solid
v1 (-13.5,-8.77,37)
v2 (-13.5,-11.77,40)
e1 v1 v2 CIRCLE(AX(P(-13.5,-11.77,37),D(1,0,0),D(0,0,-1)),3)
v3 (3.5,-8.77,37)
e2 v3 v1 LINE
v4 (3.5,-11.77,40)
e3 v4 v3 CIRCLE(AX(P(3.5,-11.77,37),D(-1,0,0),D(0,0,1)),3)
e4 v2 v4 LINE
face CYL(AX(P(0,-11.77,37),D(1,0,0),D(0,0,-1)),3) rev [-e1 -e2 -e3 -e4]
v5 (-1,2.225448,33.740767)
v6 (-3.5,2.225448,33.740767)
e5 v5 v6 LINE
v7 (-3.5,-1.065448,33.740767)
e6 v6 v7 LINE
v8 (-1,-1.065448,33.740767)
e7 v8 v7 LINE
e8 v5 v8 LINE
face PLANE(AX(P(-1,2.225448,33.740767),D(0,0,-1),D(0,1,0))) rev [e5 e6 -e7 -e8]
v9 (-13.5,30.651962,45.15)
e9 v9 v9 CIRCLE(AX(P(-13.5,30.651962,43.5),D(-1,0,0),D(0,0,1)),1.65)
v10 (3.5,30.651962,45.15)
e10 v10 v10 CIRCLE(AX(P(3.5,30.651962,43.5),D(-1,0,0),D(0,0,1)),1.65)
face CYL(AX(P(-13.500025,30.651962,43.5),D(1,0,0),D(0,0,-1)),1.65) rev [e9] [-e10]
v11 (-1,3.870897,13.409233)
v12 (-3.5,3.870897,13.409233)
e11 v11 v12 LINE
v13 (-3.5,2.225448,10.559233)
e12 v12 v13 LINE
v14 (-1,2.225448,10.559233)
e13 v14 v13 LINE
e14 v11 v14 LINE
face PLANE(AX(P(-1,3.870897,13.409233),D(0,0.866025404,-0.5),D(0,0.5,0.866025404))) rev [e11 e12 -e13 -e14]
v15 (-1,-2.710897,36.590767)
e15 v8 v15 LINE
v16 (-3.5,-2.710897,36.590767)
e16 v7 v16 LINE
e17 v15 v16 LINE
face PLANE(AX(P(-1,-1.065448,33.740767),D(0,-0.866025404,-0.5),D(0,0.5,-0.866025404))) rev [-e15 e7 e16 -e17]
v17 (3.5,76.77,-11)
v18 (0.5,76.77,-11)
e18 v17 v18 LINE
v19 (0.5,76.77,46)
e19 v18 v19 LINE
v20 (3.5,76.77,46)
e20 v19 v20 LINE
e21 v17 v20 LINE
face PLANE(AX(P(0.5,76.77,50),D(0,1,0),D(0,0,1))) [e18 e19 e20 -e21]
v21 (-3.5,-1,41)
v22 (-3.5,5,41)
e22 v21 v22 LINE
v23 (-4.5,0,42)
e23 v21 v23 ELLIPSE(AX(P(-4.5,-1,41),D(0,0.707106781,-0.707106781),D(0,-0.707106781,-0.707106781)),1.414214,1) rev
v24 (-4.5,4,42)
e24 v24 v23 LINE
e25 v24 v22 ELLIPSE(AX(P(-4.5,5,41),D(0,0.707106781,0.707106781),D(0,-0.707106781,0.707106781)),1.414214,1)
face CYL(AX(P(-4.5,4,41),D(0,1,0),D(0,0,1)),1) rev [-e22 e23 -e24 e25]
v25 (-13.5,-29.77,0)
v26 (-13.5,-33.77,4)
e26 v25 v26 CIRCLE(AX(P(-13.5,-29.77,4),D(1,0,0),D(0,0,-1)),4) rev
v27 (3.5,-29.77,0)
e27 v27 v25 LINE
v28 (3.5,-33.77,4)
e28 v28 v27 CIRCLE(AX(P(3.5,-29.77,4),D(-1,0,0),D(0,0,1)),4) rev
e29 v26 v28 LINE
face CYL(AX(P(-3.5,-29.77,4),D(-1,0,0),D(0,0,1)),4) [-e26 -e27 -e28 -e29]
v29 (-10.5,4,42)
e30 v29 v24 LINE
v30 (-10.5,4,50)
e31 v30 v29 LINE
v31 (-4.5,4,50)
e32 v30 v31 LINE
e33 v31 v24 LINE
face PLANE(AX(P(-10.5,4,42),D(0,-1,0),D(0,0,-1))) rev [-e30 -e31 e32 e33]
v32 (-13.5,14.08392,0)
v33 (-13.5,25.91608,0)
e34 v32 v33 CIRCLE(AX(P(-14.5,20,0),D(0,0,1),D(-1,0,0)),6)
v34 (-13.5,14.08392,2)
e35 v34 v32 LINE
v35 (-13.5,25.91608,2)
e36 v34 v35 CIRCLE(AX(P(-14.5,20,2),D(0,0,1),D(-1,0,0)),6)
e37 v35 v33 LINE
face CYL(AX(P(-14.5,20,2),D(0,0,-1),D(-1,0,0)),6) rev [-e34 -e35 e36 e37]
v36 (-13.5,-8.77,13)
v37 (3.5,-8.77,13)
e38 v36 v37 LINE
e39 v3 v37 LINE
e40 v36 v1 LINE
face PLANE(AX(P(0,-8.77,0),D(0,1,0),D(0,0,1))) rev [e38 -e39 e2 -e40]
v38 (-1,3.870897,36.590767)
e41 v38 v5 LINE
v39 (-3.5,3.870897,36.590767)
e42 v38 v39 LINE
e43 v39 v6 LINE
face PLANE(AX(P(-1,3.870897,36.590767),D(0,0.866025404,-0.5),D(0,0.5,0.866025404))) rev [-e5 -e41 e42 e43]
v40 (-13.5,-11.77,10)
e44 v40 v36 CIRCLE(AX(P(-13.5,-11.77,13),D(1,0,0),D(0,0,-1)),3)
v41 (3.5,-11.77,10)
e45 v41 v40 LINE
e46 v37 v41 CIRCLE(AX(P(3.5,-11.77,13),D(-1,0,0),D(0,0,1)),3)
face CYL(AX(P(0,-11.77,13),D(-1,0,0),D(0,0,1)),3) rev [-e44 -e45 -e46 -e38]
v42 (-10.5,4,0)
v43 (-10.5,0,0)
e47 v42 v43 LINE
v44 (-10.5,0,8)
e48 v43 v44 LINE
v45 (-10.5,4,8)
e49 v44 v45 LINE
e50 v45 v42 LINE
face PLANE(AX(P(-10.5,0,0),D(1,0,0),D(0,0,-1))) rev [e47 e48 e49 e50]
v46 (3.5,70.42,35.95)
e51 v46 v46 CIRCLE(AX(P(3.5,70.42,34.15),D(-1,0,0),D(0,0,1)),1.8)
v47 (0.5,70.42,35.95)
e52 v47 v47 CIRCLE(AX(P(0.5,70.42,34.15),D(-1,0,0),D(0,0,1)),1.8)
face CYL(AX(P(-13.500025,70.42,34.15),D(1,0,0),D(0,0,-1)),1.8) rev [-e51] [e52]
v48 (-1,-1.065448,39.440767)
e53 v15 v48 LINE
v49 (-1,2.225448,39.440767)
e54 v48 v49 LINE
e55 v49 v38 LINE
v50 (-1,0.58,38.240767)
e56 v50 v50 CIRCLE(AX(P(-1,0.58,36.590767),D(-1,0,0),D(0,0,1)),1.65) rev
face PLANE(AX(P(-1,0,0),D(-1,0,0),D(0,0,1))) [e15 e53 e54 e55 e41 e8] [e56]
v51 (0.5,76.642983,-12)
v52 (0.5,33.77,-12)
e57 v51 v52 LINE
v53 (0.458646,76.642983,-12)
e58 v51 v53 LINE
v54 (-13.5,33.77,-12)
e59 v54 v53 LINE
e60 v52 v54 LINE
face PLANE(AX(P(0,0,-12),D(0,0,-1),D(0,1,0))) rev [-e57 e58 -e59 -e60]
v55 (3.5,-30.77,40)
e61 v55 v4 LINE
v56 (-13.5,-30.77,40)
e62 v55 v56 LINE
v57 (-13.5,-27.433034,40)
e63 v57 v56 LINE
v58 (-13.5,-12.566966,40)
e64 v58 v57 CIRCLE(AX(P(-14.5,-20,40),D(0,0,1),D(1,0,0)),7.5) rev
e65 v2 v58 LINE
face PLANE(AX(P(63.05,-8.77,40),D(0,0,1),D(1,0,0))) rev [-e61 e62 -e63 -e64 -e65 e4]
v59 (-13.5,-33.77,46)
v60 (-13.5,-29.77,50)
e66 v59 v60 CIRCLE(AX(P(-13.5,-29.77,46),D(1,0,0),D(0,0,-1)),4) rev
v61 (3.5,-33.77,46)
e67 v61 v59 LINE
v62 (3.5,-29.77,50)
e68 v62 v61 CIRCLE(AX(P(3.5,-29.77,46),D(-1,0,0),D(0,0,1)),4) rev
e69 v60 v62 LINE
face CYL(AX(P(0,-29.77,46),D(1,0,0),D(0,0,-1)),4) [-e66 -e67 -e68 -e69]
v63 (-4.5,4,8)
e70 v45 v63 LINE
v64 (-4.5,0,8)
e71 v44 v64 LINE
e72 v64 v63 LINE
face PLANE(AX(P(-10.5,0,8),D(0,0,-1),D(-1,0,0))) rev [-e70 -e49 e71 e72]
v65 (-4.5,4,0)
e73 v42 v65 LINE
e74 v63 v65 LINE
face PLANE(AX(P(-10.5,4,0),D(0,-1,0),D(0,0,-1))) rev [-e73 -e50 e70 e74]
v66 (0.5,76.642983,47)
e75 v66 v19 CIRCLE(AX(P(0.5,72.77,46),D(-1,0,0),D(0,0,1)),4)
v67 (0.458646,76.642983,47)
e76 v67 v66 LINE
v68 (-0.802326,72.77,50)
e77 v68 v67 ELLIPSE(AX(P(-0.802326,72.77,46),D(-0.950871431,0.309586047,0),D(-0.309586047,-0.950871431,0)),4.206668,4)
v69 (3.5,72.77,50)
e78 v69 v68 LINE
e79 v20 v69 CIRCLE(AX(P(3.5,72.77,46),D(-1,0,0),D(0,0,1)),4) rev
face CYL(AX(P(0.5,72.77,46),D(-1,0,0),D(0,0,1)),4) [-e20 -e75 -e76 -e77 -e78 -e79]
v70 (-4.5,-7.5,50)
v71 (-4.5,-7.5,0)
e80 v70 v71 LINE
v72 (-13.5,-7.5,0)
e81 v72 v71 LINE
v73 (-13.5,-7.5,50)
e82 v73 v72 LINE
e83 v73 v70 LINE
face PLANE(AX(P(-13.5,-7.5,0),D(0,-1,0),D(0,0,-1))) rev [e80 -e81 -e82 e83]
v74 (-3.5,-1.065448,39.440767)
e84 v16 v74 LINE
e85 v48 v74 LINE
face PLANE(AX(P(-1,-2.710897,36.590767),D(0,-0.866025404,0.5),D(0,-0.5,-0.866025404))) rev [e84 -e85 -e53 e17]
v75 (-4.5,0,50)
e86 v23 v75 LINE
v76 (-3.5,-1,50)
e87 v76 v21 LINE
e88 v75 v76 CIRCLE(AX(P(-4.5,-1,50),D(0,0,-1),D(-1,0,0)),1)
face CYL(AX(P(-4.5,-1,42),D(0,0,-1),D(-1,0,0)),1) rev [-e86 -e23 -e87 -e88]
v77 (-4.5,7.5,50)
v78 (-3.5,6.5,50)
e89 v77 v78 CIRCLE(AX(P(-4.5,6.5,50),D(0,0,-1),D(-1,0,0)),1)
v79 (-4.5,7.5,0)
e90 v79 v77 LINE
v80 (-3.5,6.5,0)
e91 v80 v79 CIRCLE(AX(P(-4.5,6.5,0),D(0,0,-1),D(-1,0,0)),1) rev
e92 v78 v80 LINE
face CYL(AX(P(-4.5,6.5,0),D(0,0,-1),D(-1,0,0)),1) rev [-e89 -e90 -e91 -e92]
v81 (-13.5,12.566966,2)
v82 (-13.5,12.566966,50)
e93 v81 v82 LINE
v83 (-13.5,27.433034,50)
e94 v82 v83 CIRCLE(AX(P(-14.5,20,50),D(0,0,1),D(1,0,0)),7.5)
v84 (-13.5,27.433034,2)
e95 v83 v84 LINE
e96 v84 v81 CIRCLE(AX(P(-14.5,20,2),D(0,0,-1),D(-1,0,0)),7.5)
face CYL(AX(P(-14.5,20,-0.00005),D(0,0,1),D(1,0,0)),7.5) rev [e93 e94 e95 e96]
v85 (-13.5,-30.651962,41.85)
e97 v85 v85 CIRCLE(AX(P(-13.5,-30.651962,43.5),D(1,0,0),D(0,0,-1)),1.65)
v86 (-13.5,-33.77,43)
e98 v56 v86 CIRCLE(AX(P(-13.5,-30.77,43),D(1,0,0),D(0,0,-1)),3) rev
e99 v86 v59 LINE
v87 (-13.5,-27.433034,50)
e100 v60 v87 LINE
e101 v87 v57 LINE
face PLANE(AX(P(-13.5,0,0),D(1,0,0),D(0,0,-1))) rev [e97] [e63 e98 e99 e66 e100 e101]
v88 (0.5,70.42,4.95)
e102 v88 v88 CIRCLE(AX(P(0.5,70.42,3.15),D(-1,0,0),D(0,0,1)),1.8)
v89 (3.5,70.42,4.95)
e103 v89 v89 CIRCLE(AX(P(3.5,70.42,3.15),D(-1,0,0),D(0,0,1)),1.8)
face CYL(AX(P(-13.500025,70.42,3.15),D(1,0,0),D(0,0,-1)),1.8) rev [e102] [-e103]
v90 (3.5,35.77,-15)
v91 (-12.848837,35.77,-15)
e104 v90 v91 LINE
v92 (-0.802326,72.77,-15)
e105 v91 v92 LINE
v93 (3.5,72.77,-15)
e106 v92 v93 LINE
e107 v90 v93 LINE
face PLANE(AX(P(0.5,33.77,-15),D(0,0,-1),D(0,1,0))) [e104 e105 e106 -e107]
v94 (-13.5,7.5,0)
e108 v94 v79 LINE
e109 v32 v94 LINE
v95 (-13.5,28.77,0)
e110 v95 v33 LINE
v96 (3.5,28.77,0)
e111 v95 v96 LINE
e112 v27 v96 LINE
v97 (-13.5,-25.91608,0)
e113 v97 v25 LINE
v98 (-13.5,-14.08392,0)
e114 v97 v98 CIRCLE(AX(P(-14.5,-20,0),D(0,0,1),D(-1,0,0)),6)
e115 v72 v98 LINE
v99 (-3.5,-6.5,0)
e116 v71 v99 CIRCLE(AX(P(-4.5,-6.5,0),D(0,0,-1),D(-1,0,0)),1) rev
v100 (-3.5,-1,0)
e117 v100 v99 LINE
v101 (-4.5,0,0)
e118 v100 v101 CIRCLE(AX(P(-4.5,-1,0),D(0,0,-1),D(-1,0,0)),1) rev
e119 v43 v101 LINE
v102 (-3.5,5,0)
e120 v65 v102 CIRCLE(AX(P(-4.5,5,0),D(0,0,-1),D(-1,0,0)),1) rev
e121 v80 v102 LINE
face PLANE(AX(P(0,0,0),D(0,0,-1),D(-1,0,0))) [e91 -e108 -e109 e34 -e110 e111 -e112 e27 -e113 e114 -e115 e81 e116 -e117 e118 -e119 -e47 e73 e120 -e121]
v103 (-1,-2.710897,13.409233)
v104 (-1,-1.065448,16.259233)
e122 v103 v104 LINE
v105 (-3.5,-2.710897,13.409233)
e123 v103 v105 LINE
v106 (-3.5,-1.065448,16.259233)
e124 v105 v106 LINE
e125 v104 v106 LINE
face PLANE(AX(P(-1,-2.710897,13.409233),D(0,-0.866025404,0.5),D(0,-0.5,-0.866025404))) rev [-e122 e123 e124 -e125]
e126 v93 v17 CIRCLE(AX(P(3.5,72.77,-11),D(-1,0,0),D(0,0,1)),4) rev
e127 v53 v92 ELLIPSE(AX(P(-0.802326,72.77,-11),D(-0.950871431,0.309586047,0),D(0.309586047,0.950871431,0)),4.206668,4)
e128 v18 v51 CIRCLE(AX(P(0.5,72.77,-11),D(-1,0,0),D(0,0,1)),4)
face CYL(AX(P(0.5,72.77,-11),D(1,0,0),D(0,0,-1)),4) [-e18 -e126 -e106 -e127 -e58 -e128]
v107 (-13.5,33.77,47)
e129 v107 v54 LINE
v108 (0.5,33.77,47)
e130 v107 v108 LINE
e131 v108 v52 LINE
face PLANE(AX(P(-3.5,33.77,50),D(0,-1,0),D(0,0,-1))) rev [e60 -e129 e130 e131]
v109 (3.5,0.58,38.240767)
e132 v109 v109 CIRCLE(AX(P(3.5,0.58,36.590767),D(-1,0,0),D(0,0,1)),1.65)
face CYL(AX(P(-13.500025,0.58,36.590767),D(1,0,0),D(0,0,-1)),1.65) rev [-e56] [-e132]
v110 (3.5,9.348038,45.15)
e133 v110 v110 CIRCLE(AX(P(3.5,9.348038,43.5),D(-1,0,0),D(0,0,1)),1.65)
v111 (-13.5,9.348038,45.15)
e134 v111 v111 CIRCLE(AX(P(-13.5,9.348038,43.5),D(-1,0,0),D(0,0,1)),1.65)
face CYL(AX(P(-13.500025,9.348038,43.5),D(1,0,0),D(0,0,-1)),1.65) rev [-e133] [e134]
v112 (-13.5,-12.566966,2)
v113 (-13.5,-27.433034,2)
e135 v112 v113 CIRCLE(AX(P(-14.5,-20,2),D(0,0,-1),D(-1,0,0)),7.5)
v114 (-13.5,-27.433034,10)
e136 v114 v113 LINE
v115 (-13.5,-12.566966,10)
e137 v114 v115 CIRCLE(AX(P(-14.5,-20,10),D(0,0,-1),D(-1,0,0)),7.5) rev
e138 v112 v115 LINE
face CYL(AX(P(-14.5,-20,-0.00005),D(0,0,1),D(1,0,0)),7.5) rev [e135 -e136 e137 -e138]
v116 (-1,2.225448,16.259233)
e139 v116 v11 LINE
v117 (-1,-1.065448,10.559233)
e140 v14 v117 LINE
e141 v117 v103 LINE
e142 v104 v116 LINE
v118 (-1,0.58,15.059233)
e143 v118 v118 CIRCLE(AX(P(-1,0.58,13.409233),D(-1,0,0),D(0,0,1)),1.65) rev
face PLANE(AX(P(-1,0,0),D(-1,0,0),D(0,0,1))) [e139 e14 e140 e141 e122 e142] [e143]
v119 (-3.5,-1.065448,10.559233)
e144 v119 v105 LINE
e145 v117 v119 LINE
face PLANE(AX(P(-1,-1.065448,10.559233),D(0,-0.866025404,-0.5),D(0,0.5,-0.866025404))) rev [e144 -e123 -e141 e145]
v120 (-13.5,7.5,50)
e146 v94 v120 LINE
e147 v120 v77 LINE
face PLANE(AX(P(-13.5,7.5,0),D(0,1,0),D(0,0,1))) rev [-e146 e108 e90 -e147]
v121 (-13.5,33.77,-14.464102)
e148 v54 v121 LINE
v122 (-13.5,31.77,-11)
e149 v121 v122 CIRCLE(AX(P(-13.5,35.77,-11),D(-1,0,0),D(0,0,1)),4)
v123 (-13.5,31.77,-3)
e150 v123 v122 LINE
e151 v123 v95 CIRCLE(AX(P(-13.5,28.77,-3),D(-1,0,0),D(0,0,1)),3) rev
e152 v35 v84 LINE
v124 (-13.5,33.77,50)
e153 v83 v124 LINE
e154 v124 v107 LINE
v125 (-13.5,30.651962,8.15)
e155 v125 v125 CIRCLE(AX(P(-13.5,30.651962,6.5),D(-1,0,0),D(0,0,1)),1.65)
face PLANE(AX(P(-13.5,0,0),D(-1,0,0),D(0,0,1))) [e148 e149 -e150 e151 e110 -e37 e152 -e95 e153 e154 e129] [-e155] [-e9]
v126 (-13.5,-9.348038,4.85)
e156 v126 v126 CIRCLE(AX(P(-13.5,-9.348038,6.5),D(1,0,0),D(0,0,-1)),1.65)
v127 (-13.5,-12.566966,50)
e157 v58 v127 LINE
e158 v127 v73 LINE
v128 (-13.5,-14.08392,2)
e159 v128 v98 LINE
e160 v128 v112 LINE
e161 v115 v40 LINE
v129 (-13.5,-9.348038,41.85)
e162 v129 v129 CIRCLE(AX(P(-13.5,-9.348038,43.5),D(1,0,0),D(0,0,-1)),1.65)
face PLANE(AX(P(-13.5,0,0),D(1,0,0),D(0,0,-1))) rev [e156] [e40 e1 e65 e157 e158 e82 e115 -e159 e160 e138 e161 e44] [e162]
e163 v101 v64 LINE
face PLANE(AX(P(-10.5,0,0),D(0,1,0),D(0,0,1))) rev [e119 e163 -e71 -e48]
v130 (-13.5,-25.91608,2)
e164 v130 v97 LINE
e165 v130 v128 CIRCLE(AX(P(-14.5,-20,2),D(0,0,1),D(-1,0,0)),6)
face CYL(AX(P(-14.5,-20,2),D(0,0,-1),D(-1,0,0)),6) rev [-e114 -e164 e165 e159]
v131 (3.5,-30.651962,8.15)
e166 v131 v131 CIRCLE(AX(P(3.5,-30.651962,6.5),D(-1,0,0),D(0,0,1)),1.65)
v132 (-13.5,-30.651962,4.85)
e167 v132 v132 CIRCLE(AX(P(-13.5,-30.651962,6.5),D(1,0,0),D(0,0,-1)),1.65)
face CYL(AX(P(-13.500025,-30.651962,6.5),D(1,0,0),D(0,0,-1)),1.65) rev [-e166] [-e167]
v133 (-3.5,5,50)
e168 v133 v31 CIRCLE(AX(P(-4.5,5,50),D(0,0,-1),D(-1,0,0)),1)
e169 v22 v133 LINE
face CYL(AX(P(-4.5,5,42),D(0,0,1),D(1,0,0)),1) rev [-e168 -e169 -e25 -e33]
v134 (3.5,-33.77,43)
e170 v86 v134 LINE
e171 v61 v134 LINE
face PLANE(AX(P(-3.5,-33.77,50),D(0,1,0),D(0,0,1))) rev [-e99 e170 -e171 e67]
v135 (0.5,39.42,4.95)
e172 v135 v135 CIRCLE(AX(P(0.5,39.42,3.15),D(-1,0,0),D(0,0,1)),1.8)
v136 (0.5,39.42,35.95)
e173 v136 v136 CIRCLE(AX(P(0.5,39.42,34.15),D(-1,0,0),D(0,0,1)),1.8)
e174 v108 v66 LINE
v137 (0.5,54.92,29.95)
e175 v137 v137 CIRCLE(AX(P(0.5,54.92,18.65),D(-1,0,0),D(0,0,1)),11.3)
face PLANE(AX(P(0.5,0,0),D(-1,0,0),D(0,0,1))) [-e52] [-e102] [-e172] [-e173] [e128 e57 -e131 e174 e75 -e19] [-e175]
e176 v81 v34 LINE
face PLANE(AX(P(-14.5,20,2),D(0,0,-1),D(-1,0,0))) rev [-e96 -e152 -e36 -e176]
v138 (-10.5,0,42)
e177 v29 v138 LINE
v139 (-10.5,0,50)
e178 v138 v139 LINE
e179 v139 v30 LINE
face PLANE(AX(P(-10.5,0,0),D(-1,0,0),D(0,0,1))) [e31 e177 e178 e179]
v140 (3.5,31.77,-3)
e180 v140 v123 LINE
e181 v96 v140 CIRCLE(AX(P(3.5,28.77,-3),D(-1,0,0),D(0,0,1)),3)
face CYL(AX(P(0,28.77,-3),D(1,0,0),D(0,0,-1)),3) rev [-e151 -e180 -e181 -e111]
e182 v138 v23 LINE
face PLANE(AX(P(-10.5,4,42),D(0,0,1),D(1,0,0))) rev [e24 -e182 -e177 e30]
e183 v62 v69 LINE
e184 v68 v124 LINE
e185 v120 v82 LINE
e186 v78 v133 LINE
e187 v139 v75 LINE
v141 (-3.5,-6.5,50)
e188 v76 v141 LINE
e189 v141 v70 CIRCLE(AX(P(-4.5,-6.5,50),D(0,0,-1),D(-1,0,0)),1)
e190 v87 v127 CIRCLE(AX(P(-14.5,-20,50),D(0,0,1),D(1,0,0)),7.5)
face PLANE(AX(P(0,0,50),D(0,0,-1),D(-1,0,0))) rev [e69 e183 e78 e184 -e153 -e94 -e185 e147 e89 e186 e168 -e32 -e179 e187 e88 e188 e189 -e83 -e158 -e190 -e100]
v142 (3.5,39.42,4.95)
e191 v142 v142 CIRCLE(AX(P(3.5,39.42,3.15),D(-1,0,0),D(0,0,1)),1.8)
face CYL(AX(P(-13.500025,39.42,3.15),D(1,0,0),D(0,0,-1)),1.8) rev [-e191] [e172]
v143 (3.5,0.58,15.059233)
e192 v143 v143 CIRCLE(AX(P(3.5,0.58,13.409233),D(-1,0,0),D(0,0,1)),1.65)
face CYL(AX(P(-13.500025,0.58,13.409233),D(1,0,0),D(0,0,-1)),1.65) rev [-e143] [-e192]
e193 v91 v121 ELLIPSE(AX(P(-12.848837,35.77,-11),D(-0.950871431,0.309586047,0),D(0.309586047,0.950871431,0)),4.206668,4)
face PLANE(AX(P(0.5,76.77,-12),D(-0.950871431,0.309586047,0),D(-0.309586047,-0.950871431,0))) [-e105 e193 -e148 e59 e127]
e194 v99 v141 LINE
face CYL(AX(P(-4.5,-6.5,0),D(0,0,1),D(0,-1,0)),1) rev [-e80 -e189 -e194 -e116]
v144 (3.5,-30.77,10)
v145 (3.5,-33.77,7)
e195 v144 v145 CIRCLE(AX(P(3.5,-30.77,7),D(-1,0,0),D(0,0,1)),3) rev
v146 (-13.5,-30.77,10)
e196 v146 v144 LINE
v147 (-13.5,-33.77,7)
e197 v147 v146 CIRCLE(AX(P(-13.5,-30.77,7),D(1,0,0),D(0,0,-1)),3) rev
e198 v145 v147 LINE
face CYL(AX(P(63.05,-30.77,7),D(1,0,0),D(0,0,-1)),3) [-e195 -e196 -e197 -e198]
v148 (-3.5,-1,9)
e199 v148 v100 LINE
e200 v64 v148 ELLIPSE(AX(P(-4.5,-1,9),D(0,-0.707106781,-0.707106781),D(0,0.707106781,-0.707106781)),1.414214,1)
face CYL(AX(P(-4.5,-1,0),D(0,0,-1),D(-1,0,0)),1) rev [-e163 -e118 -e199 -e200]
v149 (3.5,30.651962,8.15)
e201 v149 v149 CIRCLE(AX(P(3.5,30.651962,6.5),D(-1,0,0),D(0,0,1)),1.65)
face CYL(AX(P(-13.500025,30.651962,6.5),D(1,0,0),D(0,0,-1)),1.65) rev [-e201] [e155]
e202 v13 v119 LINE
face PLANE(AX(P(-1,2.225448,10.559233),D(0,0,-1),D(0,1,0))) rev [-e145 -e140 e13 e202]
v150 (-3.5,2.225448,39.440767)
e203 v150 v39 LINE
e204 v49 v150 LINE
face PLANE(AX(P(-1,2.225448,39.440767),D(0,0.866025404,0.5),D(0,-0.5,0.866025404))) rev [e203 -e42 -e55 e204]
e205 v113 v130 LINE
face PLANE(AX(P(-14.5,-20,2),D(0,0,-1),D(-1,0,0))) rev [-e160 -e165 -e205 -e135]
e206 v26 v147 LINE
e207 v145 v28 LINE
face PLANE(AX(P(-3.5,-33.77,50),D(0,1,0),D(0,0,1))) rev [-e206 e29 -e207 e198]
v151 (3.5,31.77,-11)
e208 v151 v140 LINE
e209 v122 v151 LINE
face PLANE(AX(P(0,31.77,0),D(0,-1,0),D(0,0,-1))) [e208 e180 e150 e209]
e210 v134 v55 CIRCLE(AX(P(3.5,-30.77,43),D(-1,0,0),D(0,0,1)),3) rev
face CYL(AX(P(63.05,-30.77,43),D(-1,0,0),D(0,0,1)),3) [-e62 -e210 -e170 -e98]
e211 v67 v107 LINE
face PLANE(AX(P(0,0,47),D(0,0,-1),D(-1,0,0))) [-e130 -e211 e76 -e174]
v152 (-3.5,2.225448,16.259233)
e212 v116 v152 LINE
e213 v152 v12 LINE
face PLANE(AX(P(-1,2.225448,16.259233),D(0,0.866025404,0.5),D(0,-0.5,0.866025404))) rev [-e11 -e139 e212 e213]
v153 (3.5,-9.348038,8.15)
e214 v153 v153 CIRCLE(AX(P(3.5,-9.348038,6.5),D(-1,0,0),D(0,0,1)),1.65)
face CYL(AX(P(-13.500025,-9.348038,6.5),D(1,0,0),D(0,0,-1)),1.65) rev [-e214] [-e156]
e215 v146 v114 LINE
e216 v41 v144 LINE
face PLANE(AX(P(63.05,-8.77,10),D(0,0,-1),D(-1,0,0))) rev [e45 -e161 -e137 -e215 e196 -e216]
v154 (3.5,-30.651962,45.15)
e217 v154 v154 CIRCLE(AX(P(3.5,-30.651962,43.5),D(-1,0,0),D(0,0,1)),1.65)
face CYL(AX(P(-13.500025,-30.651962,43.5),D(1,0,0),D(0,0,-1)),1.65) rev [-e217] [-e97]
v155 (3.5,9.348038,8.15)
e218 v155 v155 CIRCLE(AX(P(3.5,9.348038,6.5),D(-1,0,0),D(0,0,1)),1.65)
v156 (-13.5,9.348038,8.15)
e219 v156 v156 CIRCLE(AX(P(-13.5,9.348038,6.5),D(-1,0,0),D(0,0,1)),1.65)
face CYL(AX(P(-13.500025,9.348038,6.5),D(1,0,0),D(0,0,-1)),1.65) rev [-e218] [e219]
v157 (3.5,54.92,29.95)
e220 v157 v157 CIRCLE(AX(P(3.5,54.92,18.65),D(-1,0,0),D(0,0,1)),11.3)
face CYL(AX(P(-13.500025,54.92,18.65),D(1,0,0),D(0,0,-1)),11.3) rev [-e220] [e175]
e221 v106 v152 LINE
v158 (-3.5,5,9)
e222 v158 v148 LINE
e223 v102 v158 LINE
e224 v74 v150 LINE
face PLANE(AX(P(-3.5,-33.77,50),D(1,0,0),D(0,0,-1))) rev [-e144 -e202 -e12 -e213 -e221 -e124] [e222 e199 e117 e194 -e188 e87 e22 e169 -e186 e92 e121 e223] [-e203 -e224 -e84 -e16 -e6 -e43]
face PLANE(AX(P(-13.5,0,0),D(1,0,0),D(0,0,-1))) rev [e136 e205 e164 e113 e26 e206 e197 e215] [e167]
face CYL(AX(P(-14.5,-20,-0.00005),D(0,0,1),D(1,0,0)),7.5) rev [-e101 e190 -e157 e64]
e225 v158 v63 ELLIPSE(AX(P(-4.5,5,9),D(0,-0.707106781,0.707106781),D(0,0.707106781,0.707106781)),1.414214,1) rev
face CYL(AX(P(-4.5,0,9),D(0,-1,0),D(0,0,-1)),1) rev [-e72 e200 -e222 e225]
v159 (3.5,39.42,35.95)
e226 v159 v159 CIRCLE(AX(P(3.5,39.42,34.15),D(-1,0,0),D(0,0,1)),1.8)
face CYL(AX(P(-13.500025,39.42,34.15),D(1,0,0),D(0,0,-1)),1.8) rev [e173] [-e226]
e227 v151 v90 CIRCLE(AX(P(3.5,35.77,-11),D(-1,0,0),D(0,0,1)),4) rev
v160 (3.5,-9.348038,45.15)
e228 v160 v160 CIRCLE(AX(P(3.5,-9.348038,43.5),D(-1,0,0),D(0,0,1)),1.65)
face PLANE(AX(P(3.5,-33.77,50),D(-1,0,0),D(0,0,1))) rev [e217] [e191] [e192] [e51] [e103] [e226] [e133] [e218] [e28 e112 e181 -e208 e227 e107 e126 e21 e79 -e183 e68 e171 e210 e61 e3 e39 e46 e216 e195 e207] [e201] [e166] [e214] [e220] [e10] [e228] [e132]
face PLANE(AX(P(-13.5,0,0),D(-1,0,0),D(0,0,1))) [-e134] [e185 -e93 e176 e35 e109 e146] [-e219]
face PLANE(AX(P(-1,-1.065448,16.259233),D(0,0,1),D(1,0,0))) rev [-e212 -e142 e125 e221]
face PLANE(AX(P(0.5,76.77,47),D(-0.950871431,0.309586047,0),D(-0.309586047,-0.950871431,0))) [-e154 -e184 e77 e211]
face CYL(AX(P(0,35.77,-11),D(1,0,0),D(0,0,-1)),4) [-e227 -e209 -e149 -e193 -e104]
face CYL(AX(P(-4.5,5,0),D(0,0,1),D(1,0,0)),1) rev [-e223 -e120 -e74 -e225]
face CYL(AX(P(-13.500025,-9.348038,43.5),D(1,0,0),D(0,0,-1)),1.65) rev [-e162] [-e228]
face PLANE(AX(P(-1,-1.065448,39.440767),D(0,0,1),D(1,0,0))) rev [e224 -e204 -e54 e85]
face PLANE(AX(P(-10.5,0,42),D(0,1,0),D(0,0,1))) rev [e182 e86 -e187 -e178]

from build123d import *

# Parameters (mm, degrees)
SKETCH1_W               = 7
SKETCH1_H               = 67.54
BOSS_EXTRUDE1_DEPTH     = 50
SKETCH2_W               = 50
SKETCH2_H               = 26.27
BOSS_EXTRUDE2_DEPTH     = 10
SKETCH3_R               = 7.5
CUT_EXTRUDE1_DEPTH      = 62.827687164
SKETCH4_W               = 100
SKETCH4_H               = 30
CUT_EXTRUDE2_DEPTH      = 25
BOSS_EXTRUDE3_START     = -2
BOSS_EXTRUDE3_DEPTH     = 2
CUT_EXTRUDE3_DEPTH      = 63.685029313
CUT_EXTRUDE3_DEPTH_BACK = 63.685029313
SKETCH6_R               = 1.65
SKETCH7_W               = 65
SKETCH7_H               = 43
BOSS_EXTRUDE4_DEPTH     = 3
CUT_EXTRUDE4_DEPTH      = 94.180646596
CUT_EXTRUDE4_DEPTH_BACK = 94.180646596
SKETCH8_R               = 1.8
SKETCH8_R_2             = 11.3
CUT_EXTRUDE5_DEPTH      = 94.180646596
CUT_EXTRUDE5_DEPTH_BACK = 94.180646596
SKETCH11_R              = 1.65
SKETCH12_W              = 8
SKETCH12_H              = 4
BOSS_EXTRUDE6_DEPTH     = 7
SKETCH15_W              = 17
SKETCH15_H              = 15
BOSS_EXTRUDE7_DEPTH     = 2
FILLET4_R               = 3
FILLET5_R               = 3
FILLET6_R               = 1
BOSS_EXTRUDE8_DEPTH     = 3
BOSS_EXTRUDE9_DEPTH     = 3
FILLET7_R               = 4
CUT_EXTRUDE7_DEPTH      = 2.5


with BuildPart() as part:
    # Sketch1 → Boss-Extrude1 (new body)
    with BuildSketch(Plane.XY):
        Rectangle(SKETCH1_W, SKETCH1_H)
    extrude(amount=BOSS_EXTRUDE1_DEPTH)

    # Sketch2 → Boss-Extrude2 (add)
    with BuildSketch(Plane.ZY.offset(3.5)):
        with Locations((25, 20.635)):
            Rectangle(SKETCH2_W, SKETCH2_H)
        with Locations((25, -20.635)):
            Rectangle(SKETCH2_W, SKETCH2_H)
    extrude(amount=BOSS_EXTRUDE2_DEPTH)

    # Sketch3 → Cut-Extrude1 (cut, through all)
    with BuildSketch(Plane.XY.offset(50)):
        with Locations((-14.5, 20)):
            Circle(SKETCH3_R)
        with Locations((-14.5, -20)):
            Circle(SKETCH3_R)
    extrude(amount=-CUT_EXTRUDE1_DEPTH, mode=Mode.SUBTRACT)

    # Sketch4 → Cut-Extrude2 (cut)
    with BuildSketch(Plane.XZ.offset(33.77)):
        with Locations((13.05, 25)):
            Rectangle(SKETCH4_W, SKETCH4_H)
    extrude(amount=-CUT_EXTRUDE2_DEPTH, mode=Mode.SUBTRACT)

    # Sketch5 → Boss-Extrude3 (add)
    with BuildSketch(Plane(origin=(0, 0, 0), x_dir=(-1, 0, 0), z_dir=(0, 0, -1)).offset(BOSS_EXTRUDE3_START)):
        with BuildLine():
            Line((13.5, 27.433034374), (13.5, 25.916079783))
            ThreePointArc((13.5, 25.916079783), (8.5, 20), (13.5, 14.083920217))
            Line((13.5, 14.083920217), (13.5, 12.566965626))
            ThreePointArc((13.5, 12.566965626), (7, 20), (13.5, 27.433034374))
        make_face()
        with BuildLine():
            Line((13.5, -12.566965626), (13.5, -14.083920217))
            ThreePointArc((13.5, -14.083920217), (8.5, -20), (13.5, -25.916079783))
            Line((13.5, -25.916079783), (13.5, -27.433034374))
            ThreePointArc((13.5, -27.433034374), (7, -20), (13.5, -12.566965626))
        make_face()
    extrude(amount=BOSS_EXTRUDE3_DEPTH)

    # Sketch6 → Cut-Extrude3 (cut, two sides: drawn at the far end of the back side and taken through both)
    with BuildSketch(Plane(origin=(3.5, 0, 0), x_dir=(0, 0, -1), z_dir=(1, 0, 0)).offset(-CUT_EXTRUDE3_DEPTH_BACK)):
        with Locations(Location((-6.5, 30.65196164, 0), (0, 0, 180))):
            Circle(SKETCH6_R)
        with Locations(Location((-6.5, 9.34803836, 0), (0, 0, 180))):
            Circle(SKETCH6_R)
        with Locations(Location((-43.5, 9.34803836, 0), (0, 0, 180))):
            Circle(SKETCH6_R)
        with Locations(Location((-43.5, 30.65196164, 0), (0, 0, 180))):
            Circle(SKETCH6_R)
        with Locations((-43.5, -9.34803836)):
            Circle(SKETCH6_R)
        with Locations((-43.5, -30.65196164)):
            Circle(SKETCH6_R)
        with Locations((-6.5, -9.34803836)):
            Circle(SKETCH6_R)
        with Locations((-6.5, -30.65196164)):
            Circle(SKETCH6_R)
    extrude(amount=CUT_EXTRUDE3_DEPTH + CUT_EXTRUDE3_DEPTH_BACK, mode=Mode.SUBTRACT)

    # Sketch7 → Boss-Extrude4 (add)
    with BuildSketch(Plane(origin=(3.5, 0, 0), x_dir=(0, 0, -1), z_dir=(1, 0, 0))):
        with Locations((-17.5, 55.27)):
            Rectangle(SKETCH7_W, SKETCH7_H)
    extrude(amount=-BOSS_EXTRUDE4_DEPTH)

    # Sketch8 → Cut-Extrude4 (cut, two sides: drawn at the far end of the back side and taken through both)
    with BuildSketch(Plane(origin=(3.5, 0, 0), x_dir=(0, 0, -1), z_dir=(1, 0, 0)).offset(-CUT_EXTRUDE4_DEPTH_BACK)):
        with Locations(Location((-3.15, 70.42, 0), (0, 0, 180))):
            Circle(SKETCH8_R)
        with Locations(Location((-3.15, 39.42, 0), (0, 0, 180))):
            Circle(SKETCH8_R)
        with Locations(Location((-34.15, 70.42, 0), (0, 0, 180))):
            Circle(SKETCH8_R)
        with Locations(Location((-18.65, 54.92, 0), (0, 0, 180))):
            Circle(SKETCH8_R_2)
        with Locations(Location((-34.15, 39.42, 0), (0, 0, 180))):
            Circle(SKETCH8_R)
    extrude(amount=CUT_EXTRUDE4_DEPTH + CUT_EXTRUDE4_DEPTH_BACK, mode=Mode.SUBTRACT)

    # Sketch11 → Cut-Extrude5 (cut, two sides: drawn at the far end of the back side and taken through both)
    with BuildSketch(Plane(origin=(3.5, 0, 0), x_dir=(0, 0, -1), z_dir=(1, 0, 0)).offset(-CUT_EXTRUDE5_DEPTH_BACK)):
        with Locations((-36.590767043, 0.58)):
            Circle(SKETCH11_R)
        with Locations((-13.409232957, 0.58)):
            Circle(SKETCH11_R)
    extrude(amount=CUT_EXTRUDE5_DEPTH + CUT_EXTRUDE5_DEPTH_BACK, mode=Mode.SUBTRACT)

    # Sketch12 → Boss-Extrude6 (add)
    with BuildSketch(Plane.ZY.offset(3.5)):
        with Locations((4, 2)):
            Rectangle(SKETCH12_W, SKETCH12_H)
        with Locations((46, 2)):
            Rectangle(SKETCH12_W, SKETCH12_H)
    extrude(amount=BOSS_EXTRUDE6_DEPTH)

    # Sketch15 → Boss-Extrude7 (add)
    with BuildSketch(Plane.XZ.offset(-33.77)):
        with Locations((-5, -7.5)):
            Rectangle(SKETCH15_W, SKETCH15_H)
    extrude(amount=BOSS_EXTRUDE7_DEPTH)

    # Fillet4
    fillet4_edges = [part.edges().sort_by_distance(p)[0] for p in [
        (-5, 31.77, 0),
    ]]
    fillet(fillet4_edges, radius=FILLET4_R)

    # Fillet5
    fillet5_edges = [part.edges().sort_by_distance(p)[0] for p in [
        (-5, -33.77, 40),
        (-5, -33.77, 10),
        (-5, -8.77, 40),
        (-5, -8.77, 10),
    ]]
    fillet(fillet5_edges, radius=FILLET5_R)

    # Fillet6
    fillet6_edges = [part.edges().sort_by_distance(p)[0] for p in [
        (-3.5, 2, 8),
        (-3.5, 2, 42),
        (-3.5, 0, 46),
        (-3.5, 4, 46),
        (-3.5, 4, 4),
        (-3.5, 0, 4),
        (-3.5, 7.5, 25),
        (-3.5, -7.5, 25),
    ]]
    fillet(fillet6_edges, radius=FILLET6_R)

    # Sketch17 → Boss-Extrude8 (add)
    with BuildSketch(Plane.XY.offset(50)):
        Polygon((0.5, 76.77), (-13.5, 33.77), (0.5, 33.77), align=None)
    extrude(amount=-BOSS_EXTRUDE8_DEPTH)

    # Sketch18 → Boss-Extrude9 (add)
    with BuildSketch(Plane(origin=(0, 0, -15), x_dir=(-1, 0, 0), z_dir=(0, 0, -1))):
        Polygon((-0.5, 76.77), (13.5, 33.77), (-0.5, 33.77), align=None)
    extrude(amount=-BOSS_EXTRUDE9_DEPTH)

    # Fillet7
    # the kernel refuses this fillet: 4 mm, written as the material it takes off along each edge
    with BuildSketch(Plane(origin=(13.5, -33.77, 50), x_dir=(0, 1, 0), z_dir=(-1, 0, 0)), Plane(origin=(-23.5, -33.77, 0), x_dir=(0, 1, 0), z_dir=(1, 0, 0)), Plane(origin=(13.5, 31.77, -15), x_dir=(0, 0, 1), z_dir=(-1, 0, 0))) as fillet7_piece_1:
        with BuildLine():
            CenterArc((FILLET7_R, FILLET7_R), FILLET7_R, 180, 90)
            Line((0, FILLET7_R), (0, 0))
            Line((0, 0), (FILLET7_R, 0))
        make_face()
    extrude(amount=37, mode=Mode.SUBTRACT)
    with BuildSketch(Plane(origin=(13.5, 76.77, -15), x_dir=(0, -1, 0), z_dir=(-1, 0, 0))) as fillet7_piece_2:
        with BuildLine():
            CenterArc((FILLET7_R, FILLET7_R), FILLET7_R, 180, 90)
            Line((0, FILLET7_R), (0, 0))
            Line((0, 0), (FILLET7_R, 0))
        make_face()
    extrude(amount=23, mode=Mode.SUBTRACT)
    with BuildSketch(Plane(origin=(13.5, 76.77, 50), x_dir=(0, -1, 0), z_dir=(-1, 0, 0))) as fillet7_piece_3:
        with BuildLine():
            CenterArc((FILLET7_R, -FILLET7_R), FILLET7_R, 90, 90)
            Line((0, -FILLET7_R), (0, 0))
            Line((0, 0), (FILLET7_R, 0))
        make_face()
    extrude(amount=23, mode=Mode.SUBTRACT)

    # Sketch19 → Cut-Extrude7 (cut)
    with BuildSketch(Plane.ZY.offset(3.5)):
        Polygon((13.409232957, 3.870896534), (10.559232957, 2.225448267), (10.559232957, -1.065448267), (13.409232957, -2.710896534), (16.259232957, -1.065448267), (16.259232957, 2.225448267), align=None)
        Polygon((36.590767043, 3.870896534), (33.740767043, 2.225448267), (33.740767043, -1.065448267), (36.590767043, -2.710896534), (39.440767043, -1.065448267), (39.440767043, 2.225448267), align=None)
    extrude(amount=-CUT_EXTRUDE7_DEPTH, mode=Mode.SUBTRACT)


solid = part.part
